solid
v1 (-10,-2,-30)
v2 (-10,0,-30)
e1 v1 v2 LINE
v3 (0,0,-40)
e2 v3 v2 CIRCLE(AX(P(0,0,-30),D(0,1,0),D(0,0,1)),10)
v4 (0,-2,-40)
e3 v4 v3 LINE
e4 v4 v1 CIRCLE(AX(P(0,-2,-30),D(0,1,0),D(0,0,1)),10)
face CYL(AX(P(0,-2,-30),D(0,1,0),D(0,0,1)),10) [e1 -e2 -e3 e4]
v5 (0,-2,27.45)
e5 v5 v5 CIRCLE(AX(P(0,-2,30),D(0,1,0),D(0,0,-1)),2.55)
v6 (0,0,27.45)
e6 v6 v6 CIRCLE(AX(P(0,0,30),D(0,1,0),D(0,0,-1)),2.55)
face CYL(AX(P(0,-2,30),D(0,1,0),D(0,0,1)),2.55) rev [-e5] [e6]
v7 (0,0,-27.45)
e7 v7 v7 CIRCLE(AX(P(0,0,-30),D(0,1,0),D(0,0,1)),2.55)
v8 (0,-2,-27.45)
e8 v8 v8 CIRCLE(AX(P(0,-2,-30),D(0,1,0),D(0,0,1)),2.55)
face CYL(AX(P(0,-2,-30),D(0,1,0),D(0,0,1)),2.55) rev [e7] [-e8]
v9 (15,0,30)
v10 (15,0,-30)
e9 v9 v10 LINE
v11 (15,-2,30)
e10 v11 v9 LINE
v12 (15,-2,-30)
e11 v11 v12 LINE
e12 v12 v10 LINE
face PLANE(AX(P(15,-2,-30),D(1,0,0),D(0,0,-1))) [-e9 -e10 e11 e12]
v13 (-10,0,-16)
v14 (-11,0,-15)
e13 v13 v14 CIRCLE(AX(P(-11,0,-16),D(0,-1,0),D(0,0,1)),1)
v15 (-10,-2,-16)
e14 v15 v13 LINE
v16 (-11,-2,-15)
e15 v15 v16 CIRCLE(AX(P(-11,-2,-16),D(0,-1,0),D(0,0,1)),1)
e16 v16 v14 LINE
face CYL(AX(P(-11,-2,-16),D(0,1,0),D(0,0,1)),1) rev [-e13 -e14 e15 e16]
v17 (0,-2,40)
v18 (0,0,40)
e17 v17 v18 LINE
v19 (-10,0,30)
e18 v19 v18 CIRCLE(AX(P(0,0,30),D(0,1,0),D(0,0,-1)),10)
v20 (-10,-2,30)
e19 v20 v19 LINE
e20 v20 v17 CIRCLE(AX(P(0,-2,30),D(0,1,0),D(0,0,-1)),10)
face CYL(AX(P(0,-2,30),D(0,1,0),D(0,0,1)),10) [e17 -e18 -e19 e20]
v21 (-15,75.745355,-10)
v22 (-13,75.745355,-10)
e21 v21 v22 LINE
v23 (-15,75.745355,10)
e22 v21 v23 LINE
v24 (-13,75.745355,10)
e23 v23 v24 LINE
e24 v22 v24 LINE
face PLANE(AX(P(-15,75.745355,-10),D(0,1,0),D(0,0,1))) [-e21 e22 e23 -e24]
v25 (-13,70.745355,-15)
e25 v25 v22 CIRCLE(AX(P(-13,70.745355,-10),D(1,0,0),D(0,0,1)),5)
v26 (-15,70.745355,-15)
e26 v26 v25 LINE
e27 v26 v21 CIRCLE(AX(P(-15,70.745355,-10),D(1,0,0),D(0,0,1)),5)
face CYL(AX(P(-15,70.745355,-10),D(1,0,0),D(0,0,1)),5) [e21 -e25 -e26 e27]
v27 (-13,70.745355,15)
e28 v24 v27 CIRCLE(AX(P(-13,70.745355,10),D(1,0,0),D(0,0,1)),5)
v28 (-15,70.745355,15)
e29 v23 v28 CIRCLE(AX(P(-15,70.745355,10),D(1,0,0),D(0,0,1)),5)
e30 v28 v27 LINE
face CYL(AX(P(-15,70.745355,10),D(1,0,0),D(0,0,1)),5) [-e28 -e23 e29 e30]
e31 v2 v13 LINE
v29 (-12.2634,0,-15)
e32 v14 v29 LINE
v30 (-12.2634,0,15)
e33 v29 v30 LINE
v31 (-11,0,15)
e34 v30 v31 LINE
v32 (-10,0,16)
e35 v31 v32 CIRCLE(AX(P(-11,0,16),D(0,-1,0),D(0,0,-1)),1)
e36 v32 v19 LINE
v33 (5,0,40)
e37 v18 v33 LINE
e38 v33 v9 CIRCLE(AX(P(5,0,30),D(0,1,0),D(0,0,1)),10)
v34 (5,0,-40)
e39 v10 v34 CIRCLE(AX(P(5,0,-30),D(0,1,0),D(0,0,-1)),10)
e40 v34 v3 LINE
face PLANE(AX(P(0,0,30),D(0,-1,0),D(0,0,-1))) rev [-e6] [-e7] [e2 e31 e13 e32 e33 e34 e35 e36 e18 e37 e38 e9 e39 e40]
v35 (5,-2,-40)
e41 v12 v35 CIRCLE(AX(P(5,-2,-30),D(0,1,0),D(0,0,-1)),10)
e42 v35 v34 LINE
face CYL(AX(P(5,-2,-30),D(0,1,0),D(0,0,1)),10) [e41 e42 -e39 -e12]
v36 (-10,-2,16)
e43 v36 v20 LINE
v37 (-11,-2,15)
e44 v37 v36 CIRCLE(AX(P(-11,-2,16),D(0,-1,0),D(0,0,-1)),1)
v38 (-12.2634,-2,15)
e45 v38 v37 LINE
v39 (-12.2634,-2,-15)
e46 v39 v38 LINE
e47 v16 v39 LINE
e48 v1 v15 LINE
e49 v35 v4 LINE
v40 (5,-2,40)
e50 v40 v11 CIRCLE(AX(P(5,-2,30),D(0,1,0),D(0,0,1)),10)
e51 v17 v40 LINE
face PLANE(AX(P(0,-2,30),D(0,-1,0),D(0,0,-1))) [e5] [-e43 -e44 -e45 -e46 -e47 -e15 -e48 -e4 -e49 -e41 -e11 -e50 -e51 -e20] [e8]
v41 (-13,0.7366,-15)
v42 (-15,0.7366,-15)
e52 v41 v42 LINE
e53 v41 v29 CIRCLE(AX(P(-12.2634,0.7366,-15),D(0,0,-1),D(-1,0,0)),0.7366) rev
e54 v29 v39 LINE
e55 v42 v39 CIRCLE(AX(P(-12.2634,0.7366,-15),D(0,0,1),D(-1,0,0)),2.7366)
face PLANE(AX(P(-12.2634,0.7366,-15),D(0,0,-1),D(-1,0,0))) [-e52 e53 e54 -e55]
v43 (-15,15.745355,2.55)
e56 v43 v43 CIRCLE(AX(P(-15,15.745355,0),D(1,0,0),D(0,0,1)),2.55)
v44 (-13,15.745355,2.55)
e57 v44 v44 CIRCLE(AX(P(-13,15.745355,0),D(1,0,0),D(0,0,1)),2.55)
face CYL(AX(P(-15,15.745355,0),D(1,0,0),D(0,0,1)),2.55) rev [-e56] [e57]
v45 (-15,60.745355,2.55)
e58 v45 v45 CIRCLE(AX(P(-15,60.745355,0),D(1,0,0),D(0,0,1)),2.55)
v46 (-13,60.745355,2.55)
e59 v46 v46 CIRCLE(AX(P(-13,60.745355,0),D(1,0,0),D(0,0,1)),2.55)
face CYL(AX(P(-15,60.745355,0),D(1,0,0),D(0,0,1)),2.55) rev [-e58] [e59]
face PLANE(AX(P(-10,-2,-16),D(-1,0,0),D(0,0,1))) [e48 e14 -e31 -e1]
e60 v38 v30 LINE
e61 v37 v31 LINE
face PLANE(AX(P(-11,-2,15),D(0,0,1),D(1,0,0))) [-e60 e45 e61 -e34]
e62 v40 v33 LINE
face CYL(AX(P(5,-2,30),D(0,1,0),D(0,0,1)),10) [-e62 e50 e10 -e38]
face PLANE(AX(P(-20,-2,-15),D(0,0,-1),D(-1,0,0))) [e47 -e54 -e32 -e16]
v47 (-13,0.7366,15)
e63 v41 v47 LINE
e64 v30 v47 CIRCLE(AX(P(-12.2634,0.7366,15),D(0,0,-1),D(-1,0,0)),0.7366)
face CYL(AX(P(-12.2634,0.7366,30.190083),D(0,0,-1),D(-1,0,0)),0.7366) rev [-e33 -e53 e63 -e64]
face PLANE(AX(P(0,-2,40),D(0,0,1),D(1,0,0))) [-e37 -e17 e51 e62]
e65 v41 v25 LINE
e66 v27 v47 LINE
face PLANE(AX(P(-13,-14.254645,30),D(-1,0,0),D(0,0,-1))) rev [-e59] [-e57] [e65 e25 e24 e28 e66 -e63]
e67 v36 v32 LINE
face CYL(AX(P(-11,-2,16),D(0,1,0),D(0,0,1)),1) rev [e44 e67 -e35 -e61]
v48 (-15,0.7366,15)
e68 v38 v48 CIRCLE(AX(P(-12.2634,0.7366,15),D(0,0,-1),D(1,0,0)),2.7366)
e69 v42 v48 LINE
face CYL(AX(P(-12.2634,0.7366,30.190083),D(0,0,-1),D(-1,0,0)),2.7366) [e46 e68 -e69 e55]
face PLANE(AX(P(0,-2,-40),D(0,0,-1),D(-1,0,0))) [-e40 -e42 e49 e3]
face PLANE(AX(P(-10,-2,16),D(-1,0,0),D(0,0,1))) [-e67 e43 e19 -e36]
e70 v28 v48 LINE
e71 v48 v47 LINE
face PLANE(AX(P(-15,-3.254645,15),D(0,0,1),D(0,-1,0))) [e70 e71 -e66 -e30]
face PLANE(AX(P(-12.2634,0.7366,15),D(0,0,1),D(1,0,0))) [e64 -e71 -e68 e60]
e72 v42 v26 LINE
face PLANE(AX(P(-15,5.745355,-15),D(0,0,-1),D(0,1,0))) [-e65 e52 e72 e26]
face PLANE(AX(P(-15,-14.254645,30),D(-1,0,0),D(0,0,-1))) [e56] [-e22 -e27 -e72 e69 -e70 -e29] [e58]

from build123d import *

# Parameters (mm, degrees)
SKETCH1_R                  = 2.55
BASE_FLANGE1_DEPTH         = 2
SKETCHED_START             = -90
SKETCHED_BEND1_OUTLINE_W   = 2
SKETCHED_BEND1_OUTLINE_H   = 30
SKETCHED_BEND1_DEPTH       = 75
SKETCHED_START_2           = -14.733838284
SKETCHED_BEND1_2_OUTLINE_R = 2.55
SKETCHED_BEND1_2_DEPTH     = 1.733838284
SKETCHED_START_3           = -15
SKETCHED_BEND1_3_OUTLINE_R = 2.55
SKETCHED_BEND1_3_DEPTH     = 2.7366
SKETCHED_START_4           = -16
SKETCHED_BEND1_4_DEPTH     = 31


with BuildPart() as part:
    # Base-Flange1: sheet metal written as solids
    # Sketch1 → Base-Flange1 (new body)
    with BuildSketch(Plane(origin=(0, 0, 0), x_dir=(1, 0, 0), z_dir=(0, 1, 0))):
        with BuildLine():
            Line((0, 40), (5, 40))
            ThreePointArc((5, 40), (12.071067812, 37.071067812), (15, 30))
            Line((15, 30), (15, 0))
            Line((15, 0), (15, -30))
            ThreePointArc((15, -30), (12.071067812, -37.071067812), (5, -40))
            Line((5, -40), (0, -40))
            ThreePointArc((0, -40), (-7.071067812, -37.071067812), (-10, -30))
            Line((-10, -30), (-10, -16))
            ThreePointArc((-10, -16), (-10.292893219, -15.292893219), (-11, -15))
            Line((-11, -15), (-20, -15))
            Line((-20, -15), (-85, -15))
            ThreePointArc((-85, -15), (-88.535533906, -13.535533906), (-90, -10))
            Line((-90, -10), (-90, 10))
            ThreePointArc((-90, 10), (-88.535533906, 13.535533906), (-85, 15))
            Line((-85, 15), (-20, 15))
            Line((-20, 15), (-11, 15))
            ThreePointArc((-11, 15), (-10.292893219, 15.292893219), (-10, 16))
            Line((-10, 16), (-10, 30))
            ThreePointArc((-10, 30), (-7.071067812, 37.071067812), (0, 40))
        make_face()
        with Locations(Location((0, -30, 0), (0, 0, 90))):
            Circle(SKETCH1_R, mode=Mode.SUBTRACT)
        with Locations(Location((0, 30, 0), (0, 0, 270))):
            Circle(SKETCH1_R, mode=Mode.SUBTRACT)
        with Locations(Location((-75, 0, 0), (0, 0, 270))):
            Circle(SKETCH1_R, mode=Mode.SUBTRACT)
        with Locations(Location((-30, 0, 0), (0, 0, 270))):
            Circle(SKETCH1_R, mode=Mode.SUBTRACT)
    extrude(amount=-BASE_FLANGE1_DEPTH)

    # Sketched Bend1: read off the stored shape, not the designer's step
    # Sketched Bend1 outline → Sketched Bend1 (cut)
    with BuildSketch(Plane.YZ.offset(SKETCHED_START)):
        with Locations((-1, 0)):
            Rectangle(SKETCHED_BEND1_OUTLINE_W, SKETCHED_BEND1_OUTLINE_H)
    extrude(amount=SKETCHED_BEND1_DEPTH, mode=Mode.SUBTRACT)

    # Sketched Bend1 2 outline → Sketched Bend1 2 (add)
    with BuildSketch(Plane.YZ.offset(SKETCHED_START_2)):
        with BuildLine():
            ThreePointArc((75.745355099, 10), (74.280889005, 13.535533906), (70.745355099, 15))
            Line((70.745355099, 15), (0, 15))
            Line((0, 15), (0, -15))
            Line((0, -15), (70.745355099, -15))
            ThreePointArc((70.745355099, -15), (74.280889005, -13.535533906), (75.745355099, -10))
            Line((75.745355099, -10), (75.745355099, 10))
        make_face()
        with Locations((15.745355099, 0)):
            Circle(SKETCHED_BEND1_2_OUTLINE_R, mode=Mode.SUBTRACT)
        with Locations((60.745355099, 0)):
            Circle(SKETCHED_BEND1_2_OUTLINE_R, mode=Mode.SUBTRACT)
    extrude(amount=SKETCHED_BEND1_2_DEPTH)

    # Sketched Bend1 3 outline → Sketched Bend1 3 (add)
    with BuildSketch(Plane.YZ.offset(SKETCHED_START_3)):
        with BuildLine():
            ThreePointArc((75.745355099, 10), (74.280889005, 13.535533906), (70.745355099, 15))
            Line((70.745355099, 15), (0, 15))
            Line((0, 15), (0, -15))
            Line((0, -15), (70.745355099, -15))
            ThreePointArc((70.745355099, -15), (74.280889005, -13.535533906), (75.745355099, -10))
            Line((75.745355099, -10), (75.745355099, 10))
        make_face()
        with Locations((15.745355099, 0)):
            Circle(SKETCHED_BEND1_3_OUTLINE_R, mode=Mode.SUBTRACT)
        with Locations((60.745355099, 0)):
            Circle(SKETCHED_BEND1_3_OUTLINE_R, mode=Mode.SUBTRACT)
    extrude(amount=SKETCHED_BEND1_3_DEPTH)

    # Sketched Bend1 4 outline → Sketched Bend1 4 (cut)
    with BuildSketch(Plane.XY.offset(SKETCHED_START_4)):
        with BuildLine():
            Line((-12.2634, 75.745355099), (-13, 75.745355099))
            Line((-13, 75.745355099), (-13, 0.7366))
            ThreePointArc((-13, 0.7366), (-12.784254855, 0.215745145), (-12.2634, 0))
            Line((-12.2634, 0), (-12.2634, 75.745355099))
        make_face()
        with BuildLine():
            ThreePointArc((-12.2634, -2), (-14.198468417, -1.198468417), (-15, 0.7366))
            Line((-15, 0.7366), (-15, -2))
            Line((-15, -2), (-12.2634, -2))
        make_face()
    extrude(amount=SKETCHED_BEND1_4_DEPTH, mode=Mode.SUBTRACT)


solid = part.part
